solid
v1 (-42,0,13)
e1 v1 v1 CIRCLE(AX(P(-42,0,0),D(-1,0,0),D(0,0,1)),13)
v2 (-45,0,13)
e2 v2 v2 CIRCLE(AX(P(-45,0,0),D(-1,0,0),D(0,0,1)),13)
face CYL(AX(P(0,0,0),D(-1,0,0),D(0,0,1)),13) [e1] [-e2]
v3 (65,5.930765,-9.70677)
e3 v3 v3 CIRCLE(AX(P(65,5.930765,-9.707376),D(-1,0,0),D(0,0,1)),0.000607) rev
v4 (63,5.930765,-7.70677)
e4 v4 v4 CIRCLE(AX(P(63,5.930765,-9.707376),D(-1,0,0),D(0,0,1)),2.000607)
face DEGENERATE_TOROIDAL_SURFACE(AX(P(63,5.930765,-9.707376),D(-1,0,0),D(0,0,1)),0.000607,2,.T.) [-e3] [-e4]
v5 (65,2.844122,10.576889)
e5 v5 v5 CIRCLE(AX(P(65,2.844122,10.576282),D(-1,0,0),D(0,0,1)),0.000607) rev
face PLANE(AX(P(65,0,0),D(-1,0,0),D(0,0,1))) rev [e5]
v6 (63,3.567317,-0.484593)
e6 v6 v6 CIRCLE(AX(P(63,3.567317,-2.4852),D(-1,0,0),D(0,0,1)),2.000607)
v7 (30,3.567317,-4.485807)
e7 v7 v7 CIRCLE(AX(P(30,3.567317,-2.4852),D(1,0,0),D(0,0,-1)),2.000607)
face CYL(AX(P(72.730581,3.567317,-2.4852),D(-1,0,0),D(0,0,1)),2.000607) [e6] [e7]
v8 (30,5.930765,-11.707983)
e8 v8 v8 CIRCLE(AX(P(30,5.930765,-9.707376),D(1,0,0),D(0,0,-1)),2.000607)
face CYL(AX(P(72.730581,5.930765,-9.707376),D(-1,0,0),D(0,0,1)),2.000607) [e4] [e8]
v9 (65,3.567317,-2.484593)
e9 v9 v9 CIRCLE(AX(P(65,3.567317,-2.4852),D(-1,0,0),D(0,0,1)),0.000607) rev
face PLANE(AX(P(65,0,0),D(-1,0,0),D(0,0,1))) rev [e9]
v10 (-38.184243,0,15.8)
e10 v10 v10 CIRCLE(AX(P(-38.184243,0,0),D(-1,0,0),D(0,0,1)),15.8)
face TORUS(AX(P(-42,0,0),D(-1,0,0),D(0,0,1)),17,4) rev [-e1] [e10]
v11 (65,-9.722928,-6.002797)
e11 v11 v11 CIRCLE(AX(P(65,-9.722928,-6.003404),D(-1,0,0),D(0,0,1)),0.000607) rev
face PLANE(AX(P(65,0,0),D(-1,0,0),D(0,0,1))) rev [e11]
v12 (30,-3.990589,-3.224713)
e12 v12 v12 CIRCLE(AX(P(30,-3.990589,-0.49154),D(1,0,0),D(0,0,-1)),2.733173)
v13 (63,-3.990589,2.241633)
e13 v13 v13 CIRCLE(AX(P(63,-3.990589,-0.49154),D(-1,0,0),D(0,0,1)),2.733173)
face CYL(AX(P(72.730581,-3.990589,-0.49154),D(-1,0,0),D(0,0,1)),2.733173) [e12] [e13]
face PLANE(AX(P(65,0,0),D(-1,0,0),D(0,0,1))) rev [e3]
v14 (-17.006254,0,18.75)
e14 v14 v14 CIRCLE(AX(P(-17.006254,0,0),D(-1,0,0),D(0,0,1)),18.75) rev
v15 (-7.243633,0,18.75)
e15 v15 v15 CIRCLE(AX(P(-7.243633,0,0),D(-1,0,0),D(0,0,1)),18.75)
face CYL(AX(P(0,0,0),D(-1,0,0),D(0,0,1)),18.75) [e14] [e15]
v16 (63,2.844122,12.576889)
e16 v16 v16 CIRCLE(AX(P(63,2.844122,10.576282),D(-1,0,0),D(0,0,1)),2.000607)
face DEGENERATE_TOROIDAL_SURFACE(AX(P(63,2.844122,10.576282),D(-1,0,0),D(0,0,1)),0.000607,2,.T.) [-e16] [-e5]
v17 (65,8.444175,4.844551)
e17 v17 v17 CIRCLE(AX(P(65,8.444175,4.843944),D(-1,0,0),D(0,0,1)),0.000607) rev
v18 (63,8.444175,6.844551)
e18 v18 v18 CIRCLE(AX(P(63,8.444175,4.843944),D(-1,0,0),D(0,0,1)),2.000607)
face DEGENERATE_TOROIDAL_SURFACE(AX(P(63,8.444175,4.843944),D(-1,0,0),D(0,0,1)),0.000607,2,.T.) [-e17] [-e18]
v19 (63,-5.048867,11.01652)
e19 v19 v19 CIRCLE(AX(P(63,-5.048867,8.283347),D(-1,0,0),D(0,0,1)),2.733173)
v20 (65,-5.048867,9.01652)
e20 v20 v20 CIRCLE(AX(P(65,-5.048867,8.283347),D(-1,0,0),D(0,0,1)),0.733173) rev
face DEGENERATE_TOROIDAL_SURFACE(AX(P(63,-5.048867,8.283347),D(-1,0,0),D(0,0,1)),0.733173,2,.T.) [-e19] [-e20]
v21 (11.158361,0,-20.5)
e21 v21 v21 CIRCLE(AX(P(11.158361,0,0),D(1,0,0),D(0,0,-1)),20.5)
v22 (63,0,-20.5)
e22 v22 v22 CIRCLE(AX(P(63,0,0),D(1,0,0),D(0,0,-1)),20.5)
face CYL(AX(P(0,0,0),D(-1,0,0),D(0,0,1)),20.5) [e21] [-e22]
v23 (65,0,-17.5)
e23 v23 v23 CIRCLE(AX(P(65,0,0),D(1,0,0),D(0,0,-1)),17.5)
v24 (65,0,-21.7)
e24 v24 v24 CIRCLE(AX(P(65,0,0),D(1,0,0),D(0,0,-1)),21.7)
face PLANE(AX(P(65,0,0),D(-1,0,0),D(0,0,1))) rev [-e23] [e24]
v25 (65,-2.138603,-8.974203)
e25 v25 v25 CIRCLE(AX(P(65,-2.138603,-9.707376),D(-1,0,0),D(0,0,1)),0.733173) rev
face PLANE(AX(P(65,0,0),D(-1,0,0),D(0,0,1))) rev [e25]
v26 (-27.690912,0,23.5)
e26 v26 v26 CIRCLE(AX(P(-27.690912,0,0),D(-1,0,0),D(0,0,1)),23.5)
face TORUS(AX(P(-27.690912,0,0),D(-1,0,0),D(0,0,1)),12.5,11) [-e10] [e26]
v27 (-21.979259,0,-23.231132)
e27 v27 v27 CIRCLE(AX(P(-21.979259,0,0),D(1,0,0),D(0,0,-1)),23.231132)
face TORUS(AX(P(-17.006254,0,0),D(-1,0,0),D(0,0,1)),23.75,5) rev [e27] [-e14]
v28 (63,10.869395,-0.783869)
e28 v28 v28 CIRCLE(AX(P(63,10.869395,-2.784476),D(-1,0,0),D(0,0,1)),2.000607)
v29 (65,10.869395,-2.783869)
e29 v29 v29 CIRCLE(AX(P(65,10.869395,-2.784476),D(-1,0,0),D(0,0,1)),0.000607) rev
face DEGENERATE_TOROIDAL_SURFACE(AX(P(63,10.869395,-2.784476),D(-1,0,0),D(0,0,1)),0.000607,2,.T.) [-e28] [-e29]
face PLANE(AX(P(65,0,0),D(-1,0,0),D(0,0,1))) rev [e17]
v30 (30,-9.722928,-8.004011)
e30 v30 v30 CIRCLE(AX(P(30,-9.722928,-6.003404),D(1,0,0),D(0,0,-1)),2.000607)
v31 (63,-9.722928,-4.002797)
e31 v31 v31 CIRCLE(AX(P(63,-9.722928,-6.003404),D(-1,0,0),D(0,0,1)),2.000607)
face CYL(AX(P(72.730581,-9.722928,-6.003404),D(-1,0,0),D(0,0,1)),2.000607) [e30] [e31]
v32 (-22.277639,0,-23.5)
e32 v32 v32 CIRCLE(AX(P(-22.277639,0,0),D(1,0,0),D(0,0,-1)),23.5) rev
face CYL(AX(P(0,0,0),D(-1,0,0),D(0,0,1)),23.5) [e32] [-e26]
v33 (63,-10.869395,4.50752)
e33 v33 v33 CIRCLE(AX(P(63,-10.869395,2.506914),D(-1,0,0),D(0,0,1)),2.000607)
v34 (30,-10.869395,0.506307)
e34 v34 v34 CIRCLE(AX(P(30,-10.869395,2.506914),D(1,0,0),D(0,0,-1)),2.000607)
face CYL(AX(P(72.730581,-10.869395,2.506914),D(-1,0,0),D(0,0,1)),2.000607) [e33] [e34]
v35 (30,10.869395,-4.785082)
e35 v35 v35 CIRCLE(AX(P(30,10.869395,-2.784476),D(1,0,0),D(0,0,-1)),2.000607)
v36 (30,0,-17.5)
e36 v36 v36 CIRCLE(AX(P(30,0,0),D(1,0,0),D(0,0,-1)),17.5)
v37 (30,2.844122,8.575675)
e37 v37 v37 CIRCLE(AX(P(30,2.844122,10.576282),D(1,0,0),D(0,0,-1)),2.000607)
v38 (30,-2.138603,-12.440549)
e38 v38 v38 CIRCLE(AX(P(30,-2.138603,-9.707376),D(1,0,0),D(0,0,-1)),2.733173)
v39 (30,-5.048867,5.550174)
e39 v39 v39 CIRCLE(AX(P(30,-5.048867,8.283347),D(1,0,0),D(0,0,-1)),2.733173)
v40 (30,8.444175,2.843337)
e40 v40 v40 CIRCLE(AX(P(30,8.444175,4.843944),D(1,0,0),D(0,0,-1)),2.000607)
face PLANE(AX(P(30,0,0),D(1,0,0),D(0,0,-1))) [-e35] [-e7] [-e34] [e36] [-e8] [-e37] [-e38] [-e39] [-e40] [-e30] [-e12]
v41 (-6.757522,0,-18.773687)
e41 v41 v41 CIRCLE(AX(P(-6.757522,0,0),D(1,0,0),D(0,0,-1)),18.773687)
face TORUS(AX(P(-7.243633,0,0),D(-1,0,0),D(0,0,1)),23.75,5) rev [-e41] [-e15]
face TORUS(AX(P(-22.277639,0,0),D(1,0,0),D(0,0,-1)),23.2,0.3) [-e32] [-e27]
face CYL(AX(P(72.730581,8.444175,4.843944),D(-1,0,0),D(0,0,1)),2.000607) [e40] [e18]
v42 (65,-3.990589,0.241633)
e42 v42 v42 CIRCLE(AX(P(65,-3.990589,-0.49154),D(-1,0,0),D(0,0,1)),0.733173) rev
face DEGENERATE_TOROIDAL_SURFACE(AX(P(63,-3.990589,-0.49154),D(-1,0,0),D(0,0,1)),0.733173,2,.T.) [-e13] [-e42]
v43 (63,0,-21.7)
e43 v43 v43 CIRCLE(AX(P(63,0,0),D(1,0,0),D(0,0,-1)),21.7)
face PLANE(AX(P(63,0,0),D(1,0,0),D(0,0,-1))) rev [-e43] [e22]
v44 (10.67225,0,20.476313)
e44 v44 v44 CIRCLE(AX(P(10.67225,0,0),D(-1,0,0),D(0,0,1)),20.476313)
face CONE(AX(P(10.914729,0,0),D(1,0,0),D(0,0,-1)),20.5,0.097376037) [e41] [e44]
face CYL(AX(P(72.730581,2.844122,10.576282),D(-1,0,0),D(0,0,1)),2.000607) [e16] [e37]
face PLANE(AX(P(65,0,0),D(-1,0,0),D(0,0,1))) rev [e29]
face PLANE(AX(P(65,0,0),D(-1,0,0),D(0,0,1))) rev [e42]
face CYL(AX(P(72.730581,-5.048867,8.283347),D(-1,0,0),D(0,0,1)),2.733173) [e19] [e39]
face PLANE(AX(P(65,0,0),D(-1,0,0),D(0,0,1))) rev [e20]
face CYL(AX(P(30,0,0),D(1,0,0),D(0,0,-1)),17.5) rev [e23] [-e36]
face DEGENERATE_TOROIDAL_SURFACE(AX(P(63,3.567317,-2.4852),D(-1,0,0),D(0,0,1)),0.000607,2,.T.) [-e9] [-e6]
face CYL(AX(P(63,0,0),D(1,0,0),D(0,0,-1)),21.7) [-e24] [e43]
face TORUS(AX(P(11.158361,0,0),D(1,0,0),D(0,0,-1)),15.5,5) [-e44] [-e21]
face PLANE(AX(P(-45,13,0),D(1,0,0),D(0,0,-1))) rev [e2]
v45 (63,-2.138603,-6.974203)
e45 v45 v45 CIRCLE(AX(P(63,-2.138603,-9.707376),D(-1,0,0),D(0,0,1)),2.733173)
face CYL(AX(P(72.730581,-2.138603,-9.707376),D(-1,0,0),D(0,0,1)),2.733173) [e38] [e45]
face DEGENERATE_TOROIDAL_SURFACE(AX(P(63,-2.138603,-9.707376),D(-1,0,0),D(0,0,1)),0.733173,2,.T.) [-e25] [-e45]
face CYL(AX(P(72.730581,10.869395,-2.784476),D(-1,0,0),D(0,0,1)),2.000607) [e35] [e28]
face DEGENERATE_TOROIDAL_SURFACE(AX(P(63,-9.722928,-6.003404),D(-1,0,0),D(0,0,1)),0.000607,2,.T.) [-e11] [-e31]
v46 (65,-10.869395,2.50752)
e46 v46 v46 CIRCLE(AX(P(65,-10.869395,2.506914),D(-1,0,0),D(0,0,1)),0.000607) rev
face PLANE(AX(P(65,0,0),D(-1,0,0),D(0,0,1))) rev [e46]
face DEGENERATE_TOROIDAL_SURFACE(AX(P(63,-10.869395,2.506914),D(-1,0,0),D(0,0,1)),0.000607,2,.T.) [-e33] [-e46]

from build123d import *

# Parameters (mm, degrees)
FILLET1_R           = 5
FILLET2_R           = 0.3
FILLET3_R           = 5
SKETCH4_R           = 17.500000000000004
CUT_EXTRUDE1_DEPTH  = 35
SKETCH5_R           = 2.0006066698857174
SKETCH5_R_2         = 2.0006066698857157
SKETCH5_R_3         = 2.000606669885716
SKETCH5_R_4         = 2.733173099565215
BOSS_EXTRUDE1_DEPTH = 35
FILLET4_R           = 2
BOSS_EXTRUDE2_START = -2
SKETCH6_R           = 21.7
SKETCH6_R_2         = 20.5
BOSS_EXTRUDE2_DEPTH = 2


with BuildPart() as part:
    # Sketch3 → Revolve1 (revolve)
    with BuildSketch(Plane.XY, mode=Mode.PRIVATE) as revolve1_sk:
        with BuildLine():
            Line((65, 0), (65, 20.5))
            Line((65, 20.5), (10.914728577346645, 20.499999999999993))
            Line((10.914728577346645, 20.499999999999993), (-6.999999999999965, 18.75))
            Line((-6.999999999999965, 18.75), (-21.999999999999996, 18.749999999999993))
            Line((-21.999999999999996, 18.749999999999993), (-21.999999999999996, 23.5))
            Line((-21.999999999999996, 23.5), (-27.690911978745813, 23.5))
            ThreePointArc((-27.690911978745813, 23.5), (-34.19859974015539, 21.368483523128404), (-38.18424319433221, 15.800000000000004))
            ThreePointArc((-38.18424319433221, 15.800000000000004), (-39.63356808676015, 13.775096900680587), (-41.99999999999999, 13.000000000000009))
            Line((-41.99999999999999, 13.000000000000009), (-45, 13.000000000000004))
            Line((-45, 13.000000000000004), (-45, 0))
            Line((-45, 0), (-41.99999999999999, 0))
            Line((-41.99999999999999, 0), (65, 0))
        make_face()
    revolve(revolve1_sk.sketch.rotate(Axis((0, 0, 0), (1, 0, 0)), 90), axis=Axis((0, 0, 0), (1, 0, 0)))

    # Fillet1
    # the kernel refuses this fillet: 5 mm, written as the material it adds along each edge
    with BuildSketch(Plane(origin=(-21.999999999999996, 0, 0), x_dir=(0, 1.1e-16, 1), z_dir=(0, 1, -1.1e-16))) as fillet1_piece_1:
        with BuildLine():
            CenterArc((23.75, 4.993746088859545), FILLET1_R, 180, 87.13401601740111)
            Line((23.5, 0), (23.495, -0.09987492177718948))
            ThreePointArc((23.495, -0.09987492177718948), (21.124999999999996, -0.10000000000000142), (18.749999999999993, -0.10000000000000142))
            Line((18.749999999999993, -0.10000000000000142), (18.64999999999999, 0))
            Line((18.64999999999999, 0), (18.65, 4.993746088859545))
            Line((18.65, 4.993746088859545), (18.75, 4.993746088859545))
        make_face()
    revolve(axis=Axis((-21.999999999999996, 0, 0), (1, 0, 0)))

    # Fillet2
    fillet2_edges = [part.edges().sort_by_distance(p)[0] for p in [
        (-21.999999999999996, 4.95e-15, -23.5),
    ]]
    fillet(fillet2_edges, radius=FILLET2_R)

    # Fillet3
    # the kernel refuses this fillet: 5 mm, written as the material it adds along each edge
    with BuildSketch(Plane(origin=(-6.999999999999965, 0, 0), x_dir=(0, 1.1e-16, 1), z_dir=(0, 1, -1.1e-16))) as fillet3_piece_1:
        with BuildLine():
            CenterArc((18.75 + FILLET3_R, -FILLET3_R * 0.0487265272305), FILLET3_R, 174.42076403235384, 5.579235967646127)
            Line((18.75 + FILLET3_R * 0.00473730125852, FILLET3_R * 0.0484956949917), (18.75, 0))
            Line((18.75, 0), (18.75, -FILLET3_R * 0.0487265272305))
        make_face()
    revolve(axis=Axis((-6.999999999999965, 0, 0), (1, 0, 0)))
    # the kernel refuses this fillet: 5 mm, written as the material it takes off along each edge
    with BuildSketch(Plane(origin=(10.914728577346645, 0, 0), x_dir=(0, 1.1e-16, 1), z_dir=(0, 1, -1.1e-16))) as fillet3_2_piece_1:
        with BuildLine():
            CenterArc((20.499999999999993 - FILLET3_R, FILLET3_R * 0.0487265272305), FILLET3_R, 354.4207640323539, 5.579235967646187)
            Line((20.499999999999993, FILLET3_R * 0.0487265272305), (20.499999999999993, 0))
            Line((20.499999999999993, 0), (20.499999999999993 - FILLET3_R * 0.00473730125852, -FILLET3_R * 0.0484956949917))
        make_face()
    revolve(axis=Axis((10.914728577346645, 0, 0), (1, 0, 0)), mode=Mode.SUBTRACT)

    # Sketch4 → Cut-Extrude1 (cut)
    with BuildSketch(Plane(origin=(65, 0, 0), x_dir=(0, 0, -1), z_dir=(1, 0, 0))):
        Circle(SKETCH4_R)
    extrude(amount=-CUT_EXTRUDE1_DEPTH, mode=Mode.SUBTRACT)

    # Sketch5 → Boss-Extrude1 (add)
    with BuildSketch(Plane(origin=(30, 0, 0), x_dir=(0, 0, -1), z_dir=(1, 0, 0))):
        with Locations(Location((2.4851998621818705, 3.5673165613128455, 0), (0, 0, 180))):
            Circle(SKETCH5_R)
        with Locations(Location((2.784475529300205, 10.869395236751556, 0), (0, 0, 180))):
            Circle(SKETCH5_R_2)
        with Locations(Location((-4.843943845783035, 8.444175204210639, 0), (0, 0, 180))):
            Circle(SKETCH5_R)
        with Locations(Location((-10.576282104516107, 2.8441216745252547, 0), (0, 0, 180))):
            Circle(SKETCH5_R_3)
        with Locations(Location((9.707376349462452, 5.930765352304601, 0), (0, 0, 180))):
            Circle(SKETCH5_R_3)
        with Locations(Location((-2.5069136326072483, -10.869395236751556, 0), (0, 0, 180))):
            Circle(SKETCH5_R)
        with Locations(Location((6.003403936127238, -9.722927585004939, 0), (0, 0, 180))):
            Circle(SKETCH5_R)
        with Locations(Location((9.707376349462452, -2.1386031196042588, 0), (0, 0, 180))):
            Circle(SKETCH5_R_4)
        with Locations(Location((0.49154022580697854, -3.990589326271869, 0), (0, 0, 180))):
            Circle(SKETCH5_R_4)
        with Locations(Location((-8.28334680102288, -5.048867158653359, 0), (0, 0, 180))):
            Circle(SKETCH5_R_4)
    extrude(amount=BOSS_EXTRUDE1_DEPTH)

    # Fillet4
    fillet4_edges = [part.edges().sort_by_distance(p)[0] for p in [
        (65, 3.567316561312845, -4.485806532067588),
        (65, 10.869395236751556, -4.78508219918592),
        (65, 8.444175204210639, 2.8433371758973176),
        (65, 2.844121674525254, 8.57567543463039),
        (65, 5.9307653523046, -11.707983019348168),
        (65, -10.869395236751556, 0.5063069627215309),
        (65, -9.722927585004939, -8.004010606012956),
        (65, -2.1386031196042583, -12.440549449027667),
        (65, -3.9905893262718686, -3.2247133253721936),
        (65, -5.0488671586533584, 5.550173701457664),
    ]]
    fillet(fillet4_edges, radius=FILLET4_R)

    # Sketch6 → Boss-Extrude2 (add)
    with BuildSketch(Plane(origin=(65, 0, 0), x_dir=(0, 0, -1), z_dir=(1, 0, 0)).offset(BOSS_EXTRUDE2_START)):
        Circle(SKETCH6_R)
        Circle(SKETCH6_R_2, mode=Mode.SUBTRACT)
    extrude(amount=BOSS_EXTRUDE2_DEPTH)


solid = part.part
